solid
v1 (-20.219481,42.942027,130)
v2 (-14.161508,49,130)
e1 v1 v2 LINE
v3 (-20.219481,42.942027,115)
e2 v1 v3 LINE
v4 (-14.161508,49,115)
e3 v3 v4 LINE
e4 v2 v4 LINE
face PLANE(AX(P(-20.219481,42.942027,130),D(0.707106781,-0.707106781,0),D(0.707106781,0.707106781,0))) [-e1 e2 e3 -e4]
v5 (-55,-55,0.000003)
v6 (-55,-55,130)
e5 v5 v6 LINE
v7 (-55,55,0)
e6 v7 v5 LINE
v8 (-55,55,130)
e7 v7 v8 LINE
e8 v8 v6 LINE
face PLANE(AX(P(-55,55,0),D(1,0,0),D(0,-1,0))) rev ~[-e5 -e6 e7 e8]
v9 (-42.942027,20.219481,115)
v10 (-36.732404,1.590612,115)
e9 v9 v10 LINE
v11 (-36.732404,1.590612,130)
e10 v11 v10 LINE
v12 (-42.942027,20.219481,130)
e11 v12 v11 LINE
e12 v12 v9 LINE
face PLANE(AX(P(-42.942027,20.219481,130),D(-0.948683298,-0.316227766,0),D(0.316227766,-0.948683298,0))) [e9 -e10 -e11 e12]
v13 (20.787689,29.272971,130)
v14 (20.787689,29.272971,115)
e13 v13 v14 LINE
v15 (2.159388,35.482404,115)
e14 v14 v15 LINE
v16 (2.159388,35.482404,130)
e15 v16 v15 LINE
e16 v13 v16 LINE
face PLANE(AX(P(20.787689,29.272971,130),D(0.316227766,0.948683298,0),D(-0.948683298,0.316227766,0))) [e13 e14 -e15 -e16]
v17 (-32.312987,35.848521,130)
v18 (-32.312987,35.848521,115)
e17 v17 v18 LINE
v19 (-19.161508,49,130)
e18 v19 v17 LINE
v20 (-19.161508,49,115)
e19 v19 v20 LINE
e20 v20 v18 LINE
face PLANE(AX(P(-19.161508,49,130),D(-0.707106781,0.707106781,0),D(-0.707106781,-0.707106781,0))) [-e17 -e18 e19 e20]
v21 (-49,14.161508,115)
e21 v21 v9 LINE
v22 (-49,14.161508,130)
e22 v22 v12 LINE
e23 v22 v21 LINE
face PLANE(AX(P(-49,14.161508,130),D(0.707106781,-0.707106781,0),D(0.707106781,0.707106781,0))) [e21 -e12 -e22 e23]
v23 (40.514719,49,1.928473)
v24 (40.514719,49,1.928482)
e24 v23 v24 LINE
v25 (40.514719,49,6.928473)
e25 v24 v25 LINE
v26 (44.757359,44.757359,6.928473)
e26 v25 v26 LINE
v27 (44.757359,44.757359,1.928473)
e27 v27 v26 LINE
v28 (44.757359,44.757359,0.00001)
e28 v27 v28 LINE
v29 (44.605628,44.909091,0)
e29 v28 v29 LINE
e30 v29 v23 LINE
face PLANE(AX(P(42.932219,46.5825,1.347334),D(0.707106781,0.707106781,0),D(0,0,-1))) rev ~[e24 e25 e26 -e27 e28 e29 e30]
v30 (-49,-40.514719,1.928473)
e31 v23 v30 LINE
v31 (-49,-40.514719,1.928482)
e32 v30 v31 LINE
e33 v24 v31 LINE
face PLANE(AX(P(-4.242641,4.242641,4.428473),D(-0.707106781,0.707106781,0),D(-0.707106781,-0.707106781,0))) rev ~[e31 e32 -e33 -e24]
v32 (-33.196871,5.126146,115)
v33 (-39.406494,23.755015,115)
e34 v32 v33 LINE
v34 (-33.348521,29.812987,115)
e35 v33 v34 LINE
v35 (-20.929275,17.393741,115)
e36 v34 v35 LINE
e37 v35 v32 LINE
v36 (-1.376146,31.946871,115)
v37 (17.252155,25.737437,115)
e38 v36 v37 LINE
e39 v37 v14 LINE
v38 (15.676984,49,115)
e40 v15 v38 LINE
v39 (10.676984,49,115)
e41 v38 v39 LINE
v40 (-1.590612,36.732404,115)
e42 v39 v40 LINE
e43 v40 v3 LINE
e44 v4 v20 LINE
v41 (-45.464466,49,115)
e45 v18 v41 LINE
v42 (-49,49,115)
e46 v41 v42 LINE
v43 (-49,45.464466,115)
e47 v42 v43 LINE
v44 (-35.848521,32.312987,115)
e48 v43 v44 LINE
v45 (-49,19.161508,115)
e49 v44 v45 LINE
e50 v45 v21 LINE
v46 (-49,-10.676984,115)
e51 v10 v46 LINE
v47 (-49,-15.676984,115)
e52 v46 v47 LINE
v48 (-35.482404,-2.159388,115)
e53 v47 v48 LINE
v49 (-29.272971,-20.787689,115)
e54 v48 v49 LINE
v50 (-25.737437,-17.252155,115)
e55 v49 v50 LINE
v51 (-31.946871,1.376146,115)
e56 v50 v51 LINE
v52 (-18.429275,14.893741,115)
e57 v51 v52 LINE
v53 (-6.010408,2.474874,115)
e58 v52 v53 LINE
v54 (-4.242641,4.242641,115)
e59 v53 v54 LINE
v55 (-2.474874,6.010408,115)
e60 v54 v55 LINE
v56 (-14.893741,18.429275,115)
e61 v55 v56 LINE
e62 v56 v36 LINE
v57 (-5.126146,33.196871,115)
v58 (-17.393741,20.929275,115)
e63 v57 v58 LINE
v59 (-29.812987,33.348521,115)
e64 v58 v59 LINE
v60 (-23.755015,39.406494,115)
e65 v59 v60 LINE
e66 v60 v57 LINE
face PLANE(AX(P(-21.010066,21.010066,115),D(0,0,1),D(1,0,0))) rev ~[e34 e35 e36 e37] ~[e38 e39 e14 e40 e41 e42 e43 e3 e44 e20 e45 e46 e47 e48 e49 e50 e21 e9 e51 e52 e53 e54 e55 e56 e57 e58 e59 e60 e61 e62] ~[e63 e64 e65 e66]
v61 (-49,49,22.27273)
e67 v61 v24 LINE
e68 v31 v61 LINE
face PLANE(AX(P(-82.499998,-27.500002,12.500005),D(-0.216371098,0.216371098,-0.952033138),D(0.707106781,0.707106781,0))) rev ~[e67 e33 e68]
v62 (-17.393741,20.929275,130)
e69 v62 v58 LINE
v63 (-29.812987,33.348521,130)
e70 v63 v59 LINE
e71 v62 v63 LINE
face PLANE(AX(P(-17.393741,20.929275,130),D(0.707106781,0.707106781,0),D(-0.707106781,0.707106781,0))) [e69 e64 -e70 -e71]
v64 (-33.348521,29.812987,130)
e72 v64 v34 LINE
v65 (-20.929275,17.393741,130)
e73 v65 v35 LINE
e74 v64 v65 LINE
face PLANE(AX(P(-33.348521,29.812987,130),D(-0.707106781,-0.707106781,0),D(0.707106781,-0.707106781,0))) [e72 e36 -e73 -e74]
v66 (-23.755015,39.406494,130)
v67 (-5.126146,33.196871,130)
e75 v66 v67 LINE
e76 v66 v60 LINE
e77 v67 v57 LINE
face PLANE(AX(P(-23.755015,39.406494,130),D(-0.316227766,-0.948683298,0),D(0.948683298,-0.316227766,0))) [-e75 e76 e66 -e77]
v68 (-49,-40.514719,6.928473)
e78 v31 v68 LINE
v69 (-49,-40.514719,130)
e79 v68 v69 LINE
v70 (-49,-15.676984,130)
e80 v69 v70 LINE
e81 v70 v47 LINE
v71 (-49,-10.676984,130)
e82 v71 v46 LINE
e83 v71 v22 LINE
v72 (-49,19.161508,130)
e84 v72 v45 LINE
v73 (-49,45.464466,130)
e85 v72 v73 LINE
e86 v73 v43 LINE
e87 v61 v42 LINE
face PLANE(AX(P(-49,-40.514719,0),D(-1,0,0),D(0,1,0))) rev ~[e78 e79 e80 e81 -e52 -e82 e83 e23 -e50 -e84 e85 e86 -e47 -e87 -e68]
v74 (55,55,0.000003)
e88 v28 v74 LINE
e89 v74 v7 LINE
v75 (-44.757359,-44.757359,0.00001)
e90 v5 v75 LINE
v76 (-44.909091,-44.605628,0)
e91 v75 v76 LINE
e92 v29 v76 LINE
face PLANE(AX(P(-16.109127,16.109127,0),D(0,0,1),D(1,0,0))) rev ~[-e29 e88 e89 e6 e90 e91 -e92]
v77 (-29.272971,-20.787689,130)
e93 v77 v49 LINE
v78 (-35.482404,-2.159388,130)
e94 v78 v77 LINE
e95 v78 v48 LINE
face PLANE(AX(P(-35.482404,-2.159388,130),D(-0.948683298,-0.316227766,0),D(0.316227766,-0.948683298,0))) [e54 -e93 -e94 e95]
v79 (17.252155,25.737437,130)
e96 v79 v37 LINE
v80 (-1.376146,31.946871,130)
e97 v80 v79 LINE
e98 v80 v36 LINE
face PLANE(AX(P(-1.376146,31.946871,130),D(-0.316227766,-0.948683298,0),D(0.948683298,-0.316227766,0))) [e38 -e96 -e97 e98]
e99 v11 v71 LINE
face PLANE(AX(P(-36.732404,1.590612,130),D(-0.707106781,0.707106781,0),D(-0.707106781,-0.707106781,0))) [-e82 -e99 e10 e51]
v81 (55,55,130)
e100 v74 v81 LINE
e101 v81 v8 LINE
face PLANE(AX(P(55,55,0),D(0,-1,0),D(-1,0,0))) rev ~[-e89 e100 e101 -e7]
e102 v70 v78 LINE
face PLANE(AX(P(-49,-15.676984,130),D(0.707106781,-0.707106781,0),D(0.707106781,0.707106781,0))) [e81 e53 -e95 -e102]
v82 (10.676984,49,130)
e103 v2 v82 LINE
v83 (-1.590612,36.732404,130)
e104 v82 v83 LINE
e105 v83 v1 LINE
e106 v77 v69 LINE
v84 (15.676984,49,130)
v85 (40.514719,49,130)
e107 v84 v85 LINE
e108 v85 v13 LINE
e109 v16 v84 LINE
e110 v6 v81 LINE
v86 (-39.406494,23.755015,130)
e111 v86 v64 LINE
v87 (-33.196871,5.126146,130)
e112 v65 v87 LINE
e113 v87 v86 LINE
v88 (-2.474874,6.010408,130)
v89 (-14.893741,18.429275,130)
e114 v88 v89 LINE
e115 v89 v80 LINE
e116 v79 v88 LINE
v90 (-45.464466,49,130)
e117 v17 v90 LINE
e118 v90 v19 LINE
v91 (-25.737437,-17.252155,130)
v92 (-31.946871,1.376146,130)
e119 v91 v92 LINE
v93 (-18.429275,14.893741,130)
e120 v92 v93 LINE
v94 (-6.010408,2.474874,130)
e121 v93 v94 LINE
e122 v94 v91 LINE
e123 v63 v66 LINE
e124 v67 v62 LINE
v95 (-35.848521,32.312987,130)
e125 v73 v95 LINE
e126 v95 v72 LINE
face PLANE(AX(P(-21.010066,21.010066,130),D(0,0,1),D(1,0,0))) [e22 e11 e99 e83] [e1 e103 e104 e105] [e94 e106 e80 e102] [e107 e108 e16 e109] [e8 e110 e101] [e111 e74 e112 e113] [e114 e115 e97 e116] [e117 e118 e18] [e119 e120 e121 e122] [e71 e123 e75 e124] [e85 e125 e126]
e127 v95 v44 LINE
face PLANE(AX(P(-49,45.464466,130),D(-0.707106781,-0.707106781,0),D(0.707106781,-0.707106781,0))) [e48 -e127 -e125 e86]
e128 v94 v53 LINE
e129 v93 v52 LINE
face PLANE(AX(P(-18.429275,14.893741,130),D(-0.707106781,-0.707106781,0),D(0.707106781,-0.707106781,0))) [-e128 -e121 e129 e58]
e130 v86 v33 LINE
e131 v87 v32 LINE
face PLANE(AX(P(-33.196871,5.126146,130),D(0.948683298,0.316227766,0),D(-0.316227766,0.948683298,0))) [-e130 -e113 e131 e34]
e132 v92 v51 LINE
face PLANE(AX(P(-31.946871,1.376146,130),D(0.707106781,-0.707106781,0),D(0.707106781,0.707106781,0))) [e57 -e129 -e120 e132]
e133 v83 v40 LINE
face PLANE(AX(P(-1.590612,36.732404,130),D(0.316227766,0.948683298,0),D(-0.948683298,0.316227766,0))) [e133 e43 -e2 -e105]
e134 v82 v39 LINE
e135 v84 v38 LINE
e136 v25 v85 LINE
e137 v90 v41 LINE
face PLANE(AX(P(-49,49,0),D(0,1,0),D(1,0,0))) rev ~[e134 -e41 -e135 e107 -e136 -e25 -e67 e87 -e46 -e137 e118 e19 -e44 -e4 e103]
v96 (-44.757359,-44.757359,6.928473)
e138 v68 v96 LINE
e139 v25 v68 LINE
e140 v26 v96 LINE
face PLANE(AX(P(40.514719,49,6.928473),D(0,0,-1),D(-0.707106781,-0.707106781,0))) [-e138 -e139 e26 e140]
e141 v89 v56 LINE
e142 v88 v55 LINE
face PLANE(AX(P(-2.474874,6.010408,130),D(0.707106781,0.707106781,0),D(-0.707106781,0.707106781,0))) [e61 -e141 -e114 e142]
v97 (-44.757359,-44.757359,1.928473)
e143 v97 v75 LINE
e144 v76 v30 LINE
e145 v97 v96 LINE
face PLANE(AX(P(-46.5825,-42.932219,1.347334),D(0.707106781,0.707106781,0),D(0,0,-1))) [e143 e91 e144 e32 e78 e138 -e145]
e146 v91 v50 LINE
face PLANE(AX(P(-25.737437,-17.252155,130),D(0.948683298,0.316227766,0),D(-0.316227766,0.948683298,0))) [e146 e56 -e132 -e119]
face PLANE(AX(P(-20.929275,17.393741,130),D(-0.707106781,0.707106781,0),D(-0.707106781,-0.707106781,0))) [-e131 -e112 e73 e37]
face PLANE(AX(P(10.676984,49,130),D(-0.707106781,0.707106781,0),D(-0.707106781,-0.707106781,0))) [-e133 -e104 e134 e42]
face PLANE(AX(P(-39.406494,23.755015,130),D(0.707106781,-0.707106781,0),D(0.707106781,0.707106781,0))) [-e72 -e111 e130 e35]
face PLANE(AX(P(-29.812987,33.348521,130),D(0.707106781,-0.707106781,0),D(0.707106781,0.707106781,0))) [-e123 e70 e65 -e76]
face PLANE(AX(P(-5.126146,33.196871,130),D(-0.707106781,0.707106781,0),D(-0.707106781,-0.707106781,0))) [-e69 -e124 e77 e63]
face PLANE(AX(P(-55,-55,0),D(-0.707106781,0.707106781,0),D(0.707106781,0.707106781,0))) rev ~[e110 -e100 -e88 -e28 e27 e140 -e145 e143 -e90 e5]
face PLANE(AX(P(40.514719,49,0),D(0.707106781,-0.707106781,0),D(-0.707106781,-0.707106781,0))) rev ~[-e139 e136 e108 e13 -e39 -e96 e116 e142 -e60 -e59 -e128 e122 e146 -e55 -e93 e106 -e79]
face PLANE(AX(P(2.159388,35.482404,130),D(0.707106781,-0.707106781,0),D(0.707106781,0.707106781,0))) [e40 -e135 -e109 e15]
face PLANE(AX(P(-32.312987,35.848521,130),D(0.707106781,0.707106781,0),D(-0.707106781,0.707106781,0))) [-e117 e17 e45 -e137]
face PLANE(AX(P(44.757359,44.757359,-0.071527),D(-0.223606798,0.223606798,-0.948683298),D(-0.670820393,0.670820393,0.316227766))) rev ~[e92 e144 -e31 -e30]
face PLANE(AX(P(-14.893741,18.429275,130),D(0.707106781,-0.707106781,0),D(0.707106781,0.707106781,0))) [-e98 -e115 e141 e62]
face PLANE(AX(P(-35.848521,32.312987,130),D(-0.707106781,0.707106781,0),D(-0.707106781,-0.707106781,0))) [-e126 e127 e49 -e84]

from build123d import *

# Parameters (mm, degrees)
F1_DEPTH    = 25
F2_SIZE2    = 24.99999
F2_SIZE     = 77.78174
F4_DEPTH    = 130
F5_W        = 126.5929291126
F5_H        = 5
F6_DEPTH    = 25
F7_T1_DEPTH = 126.5929291126
F9_DEPTH    = 15


# Not quite as in the source:
# - a fillet or chamfer that OpenCascade refuses, or shapes differently, is made with other operations: its cross-section is extruded or revolved along the edge and cut away or added
# - a fillet or chamfer is up to 0.001 mm smaller than in the source, because OpenCascade refuses the exact size


with BuildPart() as f1:
    # F0 (on Top) → F1 (new body)
    with BuildSketch(Plane.XY):
        Polygon((55, 55), (-55, 55), (-55, -55), align=None)
    extrude(amount=F1_DEPTH)

    # F2 (size 77.78175 and 25 in the source; OpenCascade refuses exactly that, so slightly less here)
    f2_edges = [f1.edges().sort_by_distance(p)[0] for p in [
        (0, 0, 25),
    ]]
    f2_side = f1.faces().sort_by_distance((-18.333333, 18.333333, 25))[0]
    chamfer(f2_edges, length=F2_SIZE, length2=F2_SIZE2, reference=f2_side)

    # F3 (on Top) → F4 (join)
    with BuildSketch(Plane.XY):
        Polygon((-55, 55), (-55, -55), (55, 55), align=None)
        Polygon((-49, -40.5147186258), (-49, 49), (40.5147186258, 49), align=None, mode=Mode.SUBTRACT)
    extrude(amount=F4_DEPTH)

    # F5 (on face) → F6 (cut)
    with BuildSketch(Plane(origin=(-4.2426406871, 4.2426406871, 0), x_dir=(-0.7071067812, -0.7071067812, 0), z_dir=(-0.7071067812, 0.7071067812, 0))):
        with Locations((0, 4.4284729387)):
            Rectangle(F5_W, F5_H)
    extrude(amount=-F6_DEPTH, mode=Mode.SUBTRACT)

    # F7: chamfer of 6 x 2 on 1 edges, made by hand

    # F7_s2 → F7_t1 (cut)
    with BuildSketch(Plane(origin=(44.7573593129, 44.7573593129, 0), x_dir=(0, 0, 1), z_dir=(-0.7071067812, -0.7071067812, 0))):
        Polygon((-0.0715270613, 0), (1.9284729387, 6), (1.9284729387, 0), align=None)
    extrude(amount=F7_T1_DEPTH, mode=Mode.SUBTRACT)

    # F8 (on face) → F9 (join)
    with BuildSketch(Plane.XY.offset(130)):
        Polygon((-45.4644660941, 49), (-49, 49), (-49, 45.4644660941), (-35.8485209767, 32.3129870708), (-49, 19.1615080475), (-49, 14.1615080475), (-42.9420274413, 20.2194806062), (-36.7324044532, 1.5906116418), (-49, -10.676983905), (-49, -15.676983905), (-35.4824044532, -2.1593883582), (-29.272970773, -20.7876893988), (-25.7374368671, -17.2521554928), (-31.9468705473, 1.3761455477), (-18.4292750005, 14.8937410945), (-6.0104076401, 2.4748737342), (-4.2426406871, 4.2426406871), (-2.4748737342, 6.0104076401), (-14.8937410945, 18.4292750005), (-1.3761455477, 31.9468705473), (17.2521554928, 25.7374368671), (20.7876893988, 29.272970773), (2.1593883582, 35.4824044532), (15.676983905, 49), (10.676983905, 49), (-1.5906116418, 36.7324044532), (-20.2194806062, 42.9420274413), (-14.1615080475, 49), (-19.1615080475, 49), (-32.3129870708, 35.8485209767), align=None)
        Polygon((-33.3485209767, 29.8129870708), (-20.9292750005, 17.3937410945), (-33.1968705473, 5.1261455477), (-39.4064935354, 23.7550145121), align=None, mode=Mode.SUBTRACT)
        Polygon((-17.3937410945, 20.9292750005), (-29.8129870708, 33.3485209767), (-23.7550145121, 39.4064935354), (-5.1261455477, 33.1968705473), align=None, mode=Mode.SUBTRACT)
    extrude(amount=-F9_DEPTH)


solid = f1.part
